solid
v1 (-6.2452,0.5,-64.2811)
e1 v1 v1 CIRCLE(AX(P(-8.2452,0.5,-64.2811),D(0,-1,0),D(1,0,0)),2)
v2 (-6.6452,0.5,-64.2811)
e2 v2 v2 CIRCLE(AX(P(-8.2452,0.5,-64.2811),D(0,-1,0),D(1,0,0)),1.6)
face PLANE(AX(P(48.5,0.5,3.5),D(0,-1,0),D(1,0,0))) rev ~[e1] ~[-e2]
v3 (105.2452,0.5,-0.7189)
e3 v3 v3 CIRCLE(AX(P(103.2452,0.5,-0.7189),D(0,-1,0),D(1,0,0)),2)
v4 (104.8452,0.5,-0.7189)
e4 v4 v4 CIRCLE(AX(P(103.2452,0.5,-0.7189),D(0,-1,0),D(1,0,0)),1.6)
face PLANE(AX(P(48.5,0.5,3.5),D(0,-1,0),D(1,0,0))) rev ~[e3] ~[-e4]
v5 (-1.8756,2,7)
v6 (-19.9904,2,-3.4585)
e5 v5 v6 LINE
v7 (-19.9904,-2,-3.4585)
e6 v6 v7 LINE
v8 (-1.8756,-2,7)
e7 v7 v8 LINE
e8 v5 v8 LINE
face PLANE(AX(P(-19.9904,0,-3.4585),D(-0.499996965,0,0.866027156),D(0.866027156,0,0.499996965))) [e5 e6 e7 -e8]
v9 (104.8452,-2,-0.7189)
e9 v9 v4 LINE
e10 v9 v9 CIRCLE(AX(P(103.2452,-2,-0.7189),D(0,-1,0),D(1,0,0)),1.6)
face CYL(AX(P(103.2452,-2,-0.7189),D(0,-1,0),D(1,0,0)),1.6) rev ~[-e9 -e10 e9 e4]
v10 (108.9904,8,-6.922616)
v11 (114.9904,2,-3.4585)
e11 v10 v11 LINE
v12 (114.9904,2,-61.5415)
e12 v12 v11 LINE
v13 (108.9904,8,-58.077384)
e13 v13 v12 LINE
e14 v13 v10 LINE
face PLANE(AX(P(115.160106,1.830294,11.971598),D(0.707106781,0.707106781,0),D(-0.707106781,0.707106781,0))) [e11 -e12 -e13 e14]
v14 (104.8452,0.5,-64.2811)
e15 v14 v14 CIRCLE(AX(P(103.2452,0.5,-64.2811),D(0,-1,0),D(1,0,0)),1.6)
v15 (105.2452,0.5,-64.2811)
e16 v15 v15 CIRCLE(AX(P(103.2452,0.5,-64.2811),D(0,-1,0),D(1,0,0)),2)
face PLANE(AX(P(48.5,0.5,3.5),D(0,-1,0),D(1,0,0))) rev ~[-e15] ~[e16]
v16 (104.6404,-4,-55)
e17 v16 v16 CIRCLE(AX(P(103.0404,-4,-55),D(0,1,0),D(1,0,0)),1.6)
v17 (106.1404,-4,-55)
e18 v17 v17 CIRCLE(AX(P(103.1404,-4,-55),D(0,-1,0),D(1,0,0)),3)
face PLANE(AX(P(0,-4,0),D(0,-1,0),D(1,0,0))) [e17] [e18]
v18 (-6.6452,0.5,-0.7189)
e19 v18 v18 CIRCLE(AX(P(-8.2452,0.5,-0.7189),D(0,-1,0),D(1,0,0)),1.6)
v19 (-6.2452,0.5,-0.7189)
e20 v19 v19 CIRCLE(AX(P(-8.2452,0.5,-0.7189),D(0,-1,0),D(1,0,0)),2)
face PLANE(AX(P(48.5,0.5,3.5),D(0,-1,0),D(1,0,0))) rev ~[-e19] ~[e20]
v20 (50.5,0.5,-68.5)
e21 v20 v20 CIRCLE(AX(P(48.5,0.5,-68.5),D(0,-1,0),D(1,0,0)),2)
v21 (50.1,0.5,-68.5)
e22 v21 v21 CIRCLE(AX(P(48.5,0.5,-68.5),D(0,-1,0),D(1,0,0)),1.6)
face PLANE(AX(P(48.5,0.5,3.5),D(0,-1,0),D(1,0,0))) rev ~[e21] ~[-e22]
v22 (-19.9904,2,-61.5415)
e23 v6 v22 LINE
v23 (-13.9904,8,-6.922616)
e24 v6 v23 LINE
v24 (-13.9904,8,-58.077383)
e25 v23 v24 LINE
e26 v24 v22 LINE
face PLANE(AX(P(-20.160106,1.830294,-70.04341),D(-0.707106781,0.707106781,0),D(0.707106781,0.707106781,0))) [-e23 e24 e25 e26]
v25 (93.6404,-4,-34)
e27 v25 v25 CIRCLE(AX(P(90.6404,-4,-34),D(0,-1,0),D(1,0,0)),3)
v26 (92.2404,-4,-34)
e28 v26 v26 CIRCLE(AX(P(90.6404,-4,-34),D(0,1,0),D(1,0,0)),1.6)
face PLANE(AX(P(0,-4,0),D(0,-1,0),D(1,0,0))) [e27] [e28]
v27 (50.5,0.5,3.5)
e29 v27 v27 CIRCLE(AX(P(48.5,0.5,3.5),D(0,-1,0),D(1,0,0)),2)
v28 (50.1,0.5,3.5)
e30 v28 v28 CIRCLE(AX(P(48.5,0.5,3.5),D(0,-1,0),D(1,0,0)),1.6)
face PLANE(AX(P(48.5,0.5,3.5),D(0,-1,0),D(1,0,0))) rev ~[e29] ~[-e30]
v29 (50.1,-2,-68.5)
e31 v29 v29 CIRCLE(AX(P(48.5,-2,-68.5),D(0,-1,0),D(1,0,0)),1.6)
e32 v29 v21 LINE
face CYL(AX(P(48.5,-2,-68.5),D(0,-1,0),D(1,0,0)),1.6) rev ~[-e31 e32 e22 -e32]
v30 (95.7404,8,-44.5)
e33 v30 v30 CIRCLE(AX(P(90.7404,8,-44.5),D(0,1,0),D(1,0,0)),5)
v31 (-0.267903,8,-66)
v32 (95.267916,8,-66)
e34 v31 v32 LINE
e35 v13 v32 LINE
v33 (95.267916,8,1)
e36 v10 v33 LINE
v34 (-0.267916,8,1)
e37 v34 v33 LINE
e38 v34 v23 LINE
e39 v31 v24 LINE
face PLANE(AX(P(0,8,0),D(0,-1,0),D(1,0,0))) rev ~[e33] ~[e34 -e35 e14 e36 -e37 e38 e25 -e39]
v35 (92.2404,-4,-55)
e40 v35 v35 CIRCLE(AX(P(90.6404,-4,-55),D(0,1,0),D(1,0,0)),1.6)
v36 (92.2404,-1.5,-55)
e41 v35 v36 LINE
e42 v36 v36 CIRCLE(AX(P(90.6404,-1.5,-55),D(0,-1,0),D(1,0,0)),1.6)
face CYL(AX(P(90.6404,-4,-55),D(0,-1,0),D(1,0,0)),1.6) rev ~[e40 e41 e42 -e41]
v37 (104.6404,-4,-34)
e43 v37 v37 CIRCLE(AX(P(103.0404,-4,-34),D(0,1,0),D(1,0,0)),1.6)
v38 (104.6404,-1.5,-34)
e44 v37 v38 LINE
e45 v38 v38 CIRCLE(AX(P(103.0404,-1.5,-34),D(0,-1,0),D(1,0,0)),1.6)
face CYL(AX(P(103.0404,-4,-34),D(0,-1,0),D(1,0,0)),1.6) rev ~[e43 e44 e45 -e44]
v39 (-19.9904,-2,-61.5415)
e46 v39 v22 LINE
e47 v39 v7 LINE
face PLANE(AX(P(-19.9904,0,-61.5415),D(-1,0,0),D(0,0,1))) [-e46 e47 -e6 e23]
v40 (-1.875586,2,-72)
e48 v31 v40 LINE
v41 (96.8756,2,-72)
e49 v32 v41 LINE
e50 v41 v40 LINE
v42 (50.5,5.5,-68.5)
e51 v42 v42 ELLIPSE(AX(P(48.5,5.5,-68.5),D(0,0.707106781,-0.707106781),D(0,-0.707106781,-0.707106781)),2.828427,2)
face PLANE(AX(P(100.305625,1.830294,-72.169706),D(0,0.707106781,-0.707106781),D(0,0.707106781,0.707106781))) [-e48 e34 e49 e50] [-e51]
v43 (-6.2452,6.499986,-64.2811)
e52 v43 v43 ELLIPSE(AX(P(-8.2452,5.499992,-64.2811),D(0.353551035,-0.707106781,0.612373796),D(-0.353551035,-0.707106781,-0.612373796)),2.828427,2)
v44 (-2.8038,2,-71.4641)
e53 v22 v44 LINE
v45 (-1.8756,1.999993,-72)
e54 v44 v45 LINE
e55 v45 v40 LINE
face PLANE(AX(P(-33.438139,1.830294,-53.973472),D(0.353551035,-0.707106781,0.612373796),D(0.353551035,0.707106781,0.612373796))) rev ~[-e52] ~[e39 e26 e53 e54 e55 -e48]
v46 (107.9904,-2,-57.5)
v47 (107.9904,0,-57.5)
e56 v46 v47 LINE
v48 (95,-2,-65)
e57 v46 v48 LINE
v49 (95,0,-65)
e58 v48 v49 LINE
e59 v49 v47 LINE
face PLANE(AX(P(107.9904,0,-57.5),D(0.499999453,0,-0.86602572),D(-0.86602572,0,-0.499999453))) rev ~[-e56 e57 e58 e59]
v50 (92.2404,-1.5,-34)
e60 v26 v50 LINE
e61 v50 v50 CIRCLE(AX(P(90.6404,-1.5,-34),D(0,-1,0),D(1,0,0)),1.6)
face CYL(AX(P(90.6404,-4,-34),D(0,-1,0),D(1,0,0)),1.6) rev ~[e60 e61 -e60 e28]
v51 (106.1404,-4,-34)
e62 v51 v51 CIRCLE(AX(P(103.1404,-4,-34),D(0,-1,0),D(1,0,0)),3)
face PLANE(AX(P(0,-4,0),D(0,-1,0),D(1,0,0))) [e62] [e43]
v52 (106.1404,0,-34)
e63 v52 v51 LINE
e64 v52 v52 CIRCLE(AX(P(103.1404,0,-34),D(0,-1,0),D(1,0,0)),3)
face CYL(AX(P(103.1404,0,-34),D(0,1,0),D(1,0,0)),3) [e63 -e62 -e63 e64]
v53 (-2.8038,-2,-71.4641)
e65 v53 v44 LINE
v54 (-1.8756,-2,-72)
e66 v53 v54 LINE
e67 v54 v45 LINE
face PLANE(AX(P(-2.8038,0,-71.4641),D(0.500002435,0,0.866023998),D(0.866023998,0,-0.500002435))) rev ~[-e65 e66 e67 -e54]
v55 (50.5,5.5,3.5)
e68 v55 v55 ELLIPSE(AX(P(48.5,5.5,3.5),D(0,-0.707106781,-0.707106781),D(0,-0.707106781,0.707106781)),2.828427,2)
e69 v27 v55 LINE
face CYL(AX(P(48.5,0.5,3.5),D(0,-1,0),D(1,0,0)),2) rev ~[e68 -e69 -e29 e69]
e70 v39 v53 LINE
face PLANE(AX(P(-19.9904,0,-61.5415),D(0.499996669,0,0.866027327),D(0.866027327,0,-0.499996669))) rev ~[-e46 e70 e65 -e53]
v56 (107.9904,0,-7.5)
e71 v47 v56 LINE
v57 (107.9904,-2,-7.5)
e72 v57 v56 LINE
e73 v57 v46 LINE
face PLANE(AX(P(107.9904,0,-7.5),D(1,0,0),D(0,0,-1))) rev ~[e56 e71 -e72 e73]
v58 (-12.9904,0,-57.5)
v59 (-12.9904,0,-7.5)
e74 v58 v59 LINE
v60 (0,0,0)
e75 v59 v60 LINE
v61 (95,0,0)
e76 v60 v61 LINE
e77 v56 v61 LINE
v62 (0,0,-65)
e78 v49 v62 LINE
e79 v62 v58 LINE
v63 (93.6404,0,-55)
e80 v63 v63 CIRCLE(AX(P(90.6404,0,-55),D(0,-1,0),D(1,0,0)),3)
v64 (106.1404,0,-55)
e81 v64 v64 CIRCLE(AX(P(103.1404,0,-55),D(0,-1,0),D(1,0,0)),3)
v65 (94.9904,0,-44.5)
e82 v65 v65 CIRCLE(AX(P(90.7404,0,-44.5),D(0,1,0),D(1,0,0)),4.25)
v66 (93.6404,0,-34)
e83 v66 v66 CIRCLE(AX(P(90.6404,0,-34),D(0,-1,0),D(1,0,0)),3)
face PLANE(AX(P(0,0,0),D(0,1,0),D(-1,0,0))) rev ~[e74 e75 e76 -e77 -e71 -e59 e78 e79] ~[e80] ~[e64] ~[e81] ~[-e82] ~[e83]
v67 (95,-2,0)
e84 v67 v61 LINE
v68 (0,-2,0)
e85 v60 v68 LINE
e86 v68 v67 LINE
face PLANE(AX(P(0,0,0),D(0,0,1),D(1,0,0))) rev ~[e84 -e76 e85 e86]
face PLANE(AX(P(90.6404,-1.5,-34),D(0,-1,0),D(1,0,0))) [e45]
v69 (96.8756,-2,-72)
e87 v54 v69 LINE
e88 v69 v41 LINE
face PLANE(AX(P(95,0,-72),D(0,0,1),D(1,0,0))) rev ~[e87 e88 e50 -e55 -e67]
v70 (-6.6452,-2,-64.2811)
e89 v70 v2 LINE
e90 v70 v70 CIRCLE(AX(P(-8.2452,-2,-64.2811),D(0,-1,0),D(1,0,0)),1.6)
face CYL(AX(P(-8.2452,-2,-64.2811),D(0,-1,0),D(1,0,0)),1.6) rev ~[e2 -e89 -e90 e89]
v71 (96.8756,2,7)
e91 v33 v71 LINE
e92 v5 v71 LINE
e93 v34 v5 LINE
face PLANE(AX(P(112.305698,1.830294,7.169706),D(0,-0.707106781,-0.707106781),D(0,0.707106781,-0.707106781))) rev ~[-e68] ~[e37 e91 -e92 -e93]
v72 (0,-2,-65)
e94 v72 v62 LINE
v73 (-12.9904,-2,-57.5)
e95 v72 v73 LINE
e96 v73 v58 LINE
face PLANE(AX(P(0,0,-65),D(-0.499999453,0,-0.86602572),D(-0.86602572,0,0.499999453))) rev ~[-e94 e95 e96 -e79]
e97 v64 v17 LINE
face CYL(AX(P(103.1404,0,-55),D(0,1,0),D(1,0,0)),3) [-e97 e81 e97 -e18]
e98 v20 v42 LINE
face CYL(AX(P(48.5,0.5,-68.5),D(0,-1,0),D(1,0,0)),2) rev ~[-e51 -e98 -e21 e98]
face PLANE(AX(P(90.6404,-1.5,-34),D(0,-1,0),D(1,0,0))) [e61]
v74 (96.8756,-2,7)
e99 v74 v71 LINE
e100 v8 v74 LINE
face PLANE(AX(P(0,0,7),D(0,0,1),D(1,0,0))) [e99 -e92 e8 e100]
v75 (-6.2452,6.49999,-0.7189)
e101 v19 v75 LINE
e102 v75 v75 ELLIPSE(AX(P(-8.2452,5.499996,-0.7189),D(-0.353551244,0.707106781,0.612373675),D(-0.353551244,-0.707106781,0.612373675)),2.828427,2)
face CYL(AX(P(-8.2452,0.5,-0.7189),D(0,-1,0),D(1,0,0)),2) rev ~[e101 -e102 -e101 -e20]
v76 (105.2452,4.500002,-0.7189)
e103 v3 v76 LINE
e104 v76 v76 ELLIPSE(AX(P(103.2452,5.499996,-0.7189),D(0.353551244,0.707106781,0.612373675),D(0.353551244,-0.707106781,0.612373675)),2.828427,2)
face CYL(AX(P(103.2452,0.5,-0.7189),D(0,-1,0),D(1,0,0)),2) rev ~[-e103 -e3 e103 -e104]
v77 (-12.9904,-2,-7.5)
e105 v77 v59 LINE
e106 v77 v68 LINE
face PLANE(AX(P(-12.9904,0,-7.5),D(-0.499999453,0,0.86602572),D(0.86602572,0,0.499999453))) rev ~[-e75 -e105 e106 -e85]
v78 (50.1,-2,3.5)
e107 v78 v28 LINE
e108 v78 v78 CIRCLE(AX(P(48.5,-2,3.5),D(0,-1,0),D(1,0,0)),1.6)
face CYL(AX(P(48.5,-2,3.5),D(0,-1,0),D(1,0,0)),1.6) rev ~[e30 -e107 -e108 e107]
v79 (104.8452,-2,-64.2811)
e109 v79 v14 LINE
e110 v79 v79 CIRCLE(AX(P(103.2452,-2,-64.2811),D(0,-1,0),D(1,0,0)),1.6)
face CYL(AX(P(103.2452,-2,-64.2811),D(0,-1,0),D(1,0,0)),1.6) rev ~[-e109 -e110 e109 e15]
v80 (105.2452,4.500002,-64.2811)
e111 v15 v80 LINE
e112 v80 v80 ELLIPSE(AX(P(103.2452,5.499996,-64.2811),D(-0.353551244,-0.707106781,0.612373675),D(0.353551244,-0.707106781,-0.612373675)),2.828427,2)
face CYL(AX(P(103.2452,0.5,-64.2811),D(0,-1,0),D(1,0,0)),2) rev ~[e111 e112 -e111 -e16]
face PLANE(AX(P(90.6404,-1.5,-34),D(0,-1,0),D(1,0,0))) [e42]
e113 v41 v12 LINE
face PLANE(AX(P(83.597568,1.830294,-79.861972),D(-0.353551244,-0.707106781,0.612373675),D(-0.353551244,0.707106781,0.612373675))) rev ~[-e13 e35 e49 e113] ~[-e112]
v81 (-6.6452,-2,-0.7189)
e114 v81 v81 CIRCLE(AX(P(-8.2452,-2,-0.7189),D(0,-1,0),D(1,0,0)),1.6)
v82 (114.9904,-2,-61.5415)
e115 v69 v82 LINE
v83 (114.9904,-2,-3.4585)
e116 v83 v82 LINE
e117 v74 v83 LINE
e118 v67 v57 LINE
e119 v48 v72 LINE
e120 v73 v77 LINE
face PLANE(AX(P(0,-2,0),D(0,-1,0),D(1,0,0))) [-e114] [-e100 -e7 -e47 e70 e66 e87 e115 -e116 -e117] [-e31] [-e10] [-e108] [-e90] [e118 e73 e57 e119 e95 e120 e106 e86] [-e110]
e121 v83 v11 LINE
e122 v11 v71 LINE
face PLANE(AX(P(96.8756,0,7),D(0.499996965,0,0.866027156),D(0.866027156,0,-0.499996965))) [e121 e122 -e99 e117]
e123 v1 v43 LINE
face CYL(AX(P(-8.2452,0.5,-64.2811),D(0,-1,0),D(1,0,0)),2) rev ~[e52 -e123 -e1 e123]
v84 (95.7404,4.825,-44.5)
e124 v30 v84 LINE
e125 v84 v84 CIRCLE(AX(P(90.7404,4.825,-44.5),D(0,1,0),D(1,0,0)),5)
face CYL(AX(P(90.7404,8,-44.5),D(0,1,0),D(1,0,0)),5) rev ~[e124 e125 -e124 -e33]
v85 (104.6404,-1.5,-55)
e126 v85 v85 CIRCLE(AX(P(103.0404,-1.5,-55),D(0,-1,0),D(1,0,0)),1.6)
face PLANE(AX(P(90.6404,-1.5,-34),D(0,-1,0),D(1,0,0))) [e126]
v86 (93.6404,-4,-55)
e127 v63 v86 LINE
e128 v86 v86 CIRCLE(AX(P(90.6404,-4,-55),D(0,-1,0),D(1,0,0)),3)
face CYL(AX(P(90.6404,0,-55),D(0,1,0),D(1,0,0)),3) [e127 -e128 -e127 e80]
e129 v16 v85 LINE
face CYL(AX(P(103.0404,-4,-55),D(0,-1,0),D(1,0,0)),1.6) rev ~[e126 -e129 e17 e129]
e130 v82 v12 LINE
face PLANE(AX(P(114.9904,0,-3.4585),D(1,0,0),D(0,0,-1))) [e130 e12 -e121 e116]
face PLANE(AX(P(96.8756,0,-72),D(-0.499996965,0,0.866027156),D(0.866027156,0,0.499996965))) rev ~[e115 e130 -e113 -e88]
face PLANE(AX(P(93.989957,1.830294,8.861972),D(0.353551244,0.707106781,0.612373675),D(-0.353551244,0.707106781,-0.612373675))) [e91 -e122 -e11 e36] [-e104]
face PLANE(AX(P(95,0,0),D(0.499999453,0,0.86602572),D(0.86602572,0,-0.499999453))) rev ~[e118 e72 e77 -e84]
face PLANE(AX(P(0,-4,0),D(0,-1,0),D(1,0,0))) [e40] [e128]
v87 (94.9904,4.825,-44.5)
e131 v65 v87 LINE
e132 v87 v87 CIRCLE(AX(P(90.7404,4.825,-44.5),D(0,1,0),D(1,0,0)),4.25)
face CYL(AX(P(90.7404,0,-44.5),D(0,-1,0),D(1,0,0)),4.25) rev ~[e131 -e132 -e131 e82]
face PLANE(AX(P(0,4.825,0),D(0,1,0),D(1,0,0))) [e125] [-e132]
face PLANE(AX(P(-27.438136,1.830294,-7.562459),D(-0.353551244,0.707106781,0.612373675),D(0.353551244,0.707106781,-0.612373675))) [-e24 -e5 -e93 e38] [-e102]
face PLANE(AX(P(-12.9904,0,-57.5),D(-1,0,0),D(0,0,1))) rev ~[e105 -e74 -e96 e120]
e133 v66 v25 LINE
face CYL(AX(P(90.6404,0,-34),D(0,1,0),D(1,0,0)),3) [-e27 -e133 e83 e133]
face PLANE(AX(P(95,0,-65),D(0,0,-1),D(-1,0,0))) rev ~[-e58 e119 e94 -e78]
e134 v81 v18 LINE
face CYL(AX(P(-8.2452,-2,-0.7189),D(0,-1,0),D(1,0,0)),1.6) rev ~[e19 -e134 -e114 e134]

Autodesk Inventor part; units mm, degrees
ref_plane "YZ Plane" through (0, 0, 0) normal (1, 0, 0) x (0, 1, 0)
ref_plane "XZ Plane" through (0, 0, 0) normal (0, 1, 0) x (-1, 0, 0)
sketch "Sketch5" plane through (0, 0, 0) normal (0, 1, 0) x (-1, 0, 0)
  line L0 (0, 0) -> (-95, 0)
  line L1 (-95, 0) -> (-95, -65)
  line L2 (-95, -65) -> (0, -65)
  line L3 (0, -65) -> (0, 0)
  line L4 (0, -65) -> (12.9904, -57.5)
  line L5 (12.9904, -57.5) -> (12.9904, -7.5)
  line L6 (12.9904, -7.5) -> (0, 0)
  line L7 (-95, -65) -> (-107.9904, -57.5)
  line L8 (-107.9904, -57.5) -> (-107.9904, -7.5)
  line L9 (-107.9904, -7.5) -> (-95, 0)
  dimension "d23" = 95
  dimension "d24" = 65
  dimension "d25" = 15
  dimension "d26" = 15
  dimension "d27" = 120
  dimension "d28" = 15
  dimension "d29" = 15
  dimension "d30" = 120
extrude "Extrusion3" add sketch "Sketch5" along normal blind 8
sketch "Sketch6" plane through (0, 0, 0) normal (0, -1, 0) x (1, 0, 0)
  line L0 (0, 7) -> (87, 7)
  line L1 (95, -72) -> (8, -72)
  line L2 (0, 0) -> (95, 0) projected
  line L3 (95, -65) -> (0, -65) projected
  line L4 (96.8756, 7) -> (114.9904, -3.4585)
  line L5 (95, 0) -> (107.9904, -7.5) projected
  line L6 (114.9904, -3.4585) -> (114.9904, -61.5415)
  line L7 (107.9904, -7.5) -> (107.9904, -57.5) projected
  line L8 (96.8756, -72) -> (114.9904, -61.5415)
  line L9 (107.9904, -57.5) -> (95, -65) projected
  line L10 (107.9904, -57.5) -> (95, -65) projected
  line L11 (87, 7) -> (96.8756, 7)
  line L12 (95, -72) -> (96.8756, -72)
  line L13 (0, 7) -> (-1.8756, 7)
  line L14 (-19.9904, -3.4585) -> (-1.8756, 7)
  line L15 (-19.9904, -61.5415) -> (-2.8038, -71.4641)
  line L16 (0, -65) -> (-12.9904, -57.5) projected
  line L17 (-12.9904, -7.5) -> (0, 0) projected
  line L18 (-19.9904, -61.5415) -> (-19.9904, -3.4585)
  line L19 (-12.9904, -57.5) -> (-12.9904, -7.5) projected
  line L20 (0, -65) -> (-12.9904, -57.5) projected
  line L21 (-12.9904, -7.5) -> (-12.9904, -57.5)
  line L22 (-12.9904, -57.5) -> (0, -65)
  line L23 (95, -65) -> (0, -65) projected
  line L24 (0, -65) -> (95, -65)
  line L25 (95, -65) -> (107.9904, -57.5)
  line L26 (107.9904, -7.5) -> (107.9904, -57.5)
  line L27 (95, 0) -> (107.9904, -7.5) projected
  line L28 (107.9904, -7.5) -> (95, 0)
  line L29 (0, 0) -> (-12.9904, -7.5)
  line L30 (95, 0) -> (0, 0)
  line L31 (8, -72) -> (-1.8756, -72)
  line L32 (-2.8038, -71.4641) -> (-1.8756, -72)
  dimension "d33" = 7
  dimension "d34" = 7
  dimension "d35" = 7
  dimension "d36" = 7
  dimension "d37" = 7
  dimension "d38" = 7
  dimension "d39" = 7
  dimension "d40" = 7
extrude "Extrusion4" add sketch "Sketch6" along normal blind 2 and the other way blind 8
chamfer "Chamfer1" distance 6 angle 45 8 edges at (47.5, 8, 7) (-10.933, 8, 1.7707) (-19.9904, 8, -32.5) (-10.933, 8, -66.7707) (47.5, 8, -72) (105.933, 8, -66.7707) (114.9904, 8, -32.5) (105.933, 8, 1.7707)
sketch "Sketch7" plane through (0, 0, 0) normal (0, -1, 0) x (1, 0, 0)
  line L0 (86.4904, -40.25) -> (94.9904, -40.25)
  line L1 (94.9904, -40.25) -> (94.9904, -48.75)
  line L2 (94.9904, -48.75) -> (86.4904, -48.75)
  line L3 (86.4904, -48.75) -> (86.4904, -40.25)
  line L4 (96.8756, 7) -> (-1.8756, 7) projected
  line L5 (114.9904, -61.5415) -> (114.9904, -3.4585) projected
  circle A0 centre (90.6404, -55) radius 3
  circle A1 centre (90.6404, -34) radius 3
  circle A2 centre (103.1404, -34) radius 3
  circle A3 centre (103.1404, -55) radius 3
  circle A4 centre (90.7404, -44.5) radius 4.25
  circle A5 centre (46.5, 2.8174) radius 1.834
  circle A6 centre (46.5, -64.297) radius 1.834
  line L6 (-1.8756, -72) -> (96.8756, -72) projected
  point P0 (0, 0)
  dimension "d48" = 8.5
  dimension "d50" = 20
  dimension "d51" = 6.25
  dimension "d52" = 8.15
  dimension "d53" = 12.5
  dimension "d54" = 0
  dimension "d55" = 21
  dimension "d56" = 12.5
  dimension "d57" = 0
  dimension "d58" = 0
  dimension "d59" = 6
  dimension "d61" = 8.5
  dimension "d107" = 27.5
sketch "Sketch9" plane through (0, -2, 0) normal (0, -1, 0) x (1, 0, 0)
  circle A0 centre (-8.2452, -0.7189) radius 1.6
  line L0 (0, -65) -> (-12.9904, -57.5) projected
  line L1 (0, -65) -> (-1.8756, -72) projected
  line L2 (95, -65) -> (0, -65) projected
  line L3 (107.9904, -7.5) -> (107.9904, -57.5) projected
  line L4 (0, 0) -> (95, 0) projected
  line L5 (-12.9904, -7.5) -> (-16.4904, -1.4378)
  line L6 (-19.9904, -3.4585) -> (-1.8756, 7) projected
  line L7 (0, 0) -> (-3.5, 6.0622)
  line L8 (-12.9904, -57.5) -> (-19.9904, -61.5415) projected
  line L9 (-12.9904, -57.5) -> (-15.4904, -61.8301)
  line L10 (0, -65) -> (-2.5, -69.3301)
  line L11 (95, -65) -> (97.5, -69.3301)
  line L12 (95, 0) -> (98.5, 6.0622)
  line L13 (96.8756, 7) -> (114.9904, -3.4585) projected
  line L14 (107.9904, -7.5) -> (114.9904, -3.4585) projected
  line L15 (107.9904, -7.5) -> (111.4904, -1.4378)
  line L16 (107.9904, -57.5) -> (111.4904, -63.5622)
  line L17 (96.8756, -72) -> (114.9904, -61.5415) projected
  line L18 (107.9904, -57.5) -> (95, -65) projected
  line L19 (95, 0) -> (107.9904, -7.5) projected
  circle A1 centre (-8.2452, -64.2811) radius 1.6
  circle A2 centre (103.2452, -64.2811) radius 1.6
  circle A3 centre (103.2452, -0.7189) radius 1.6
  circle A4 centre (48.5, 3.5) radius 1.6
  circle A5 centre (48.5, -68.5) radius 1.6
  line L20 (95, -65) -> (95, -72)
  line L21 (-1.8756, -72) -> (96.8756, -72) projected
  line L22 (95, 0) -> (95, 7)
  line L23 (96.8756, 7) -> (-1.8756, 7) projected
  dimension "d62" = 90
  dimension "d63" = 90
  dimension "d64" = 90
  dimension "d65" = 7.5
  dimension "d66" = 3.5
  dimension "d67" = 3.2
  dimension "d68" = 7.5
  dimension "d69" = 3.5
  dimension "d70" = 3.5
  dimension "d71" = 7.5
  dimension "d72" = 7.5
  dimension "d73" = 3.5
  dimension "d76" = 3.5
  dimension "d77" = 46.5
  dimension "d78" = 3.5
  dimension "d79" = 46.5
extrude "Extrusion6" cut sketch "Sketch9" against normal blind 2.5 contours A0 | A1 | A2 | A3 | A4 | A5
sketch "Sketch13" plane through (48.5, 0.5, 3.5) normal (0, -1, 0) x (1, 0, 0)
  circle A0 centre (0, 0) radius 2
  circle A1 centre (54.7452, -4.2189) radius 2
  circle A2 centre (54.7452, -67.7811) radius 2
  circle A3 centre (0, -72) radius 2
  circle A4 centre (-56.7452, -67.7811) radius 2
  circle A5 centre (-56.7452, -4.2189) radius 2
  circle A6 centre (-56.7452, -4.2189) radius 1.6 projected
  circle A7 centre (0, 0) radius 1.6 projected
  circle A8 centre (54.7452, -4.2189) radius 1.6 projected
  circle A9 centre (54.7452, -67.7811) radius 1.6 projected
  circle A10 centre (0, -72) radius 1.6 projected
  circle A11 centre (-56.7452, -67.7811) radius 1.6 projected
  point P0 (-48.5, -3.5)
  dimension "d90" = 4
  dimension "d91" = 4
  dimension "d92" = 4
  dimension "d93" = 4
  dimension "d94" = 4
  dimension "d95" = 4
extrude "Extrusion7" cut sketch "Sketch13" against normal blind 10 contours A0 | A1 | A2 | A3 | A4 | A5 | A6 | A7 | A8 | A9 | A10 | A11
extrude "Extrusion8" add sketch "Sketch7" along normal blind 4 contours A0 | A1 | A2 | A3
sketch "Sketch14" plane through (0, 0, 0) normal (0, -1, 0) x (1, 0, 0)
  line L0 (86.4904, -48.75) -> (94.9904, -48.75)
  line L1 (94.9904, -48.75) -> (94.9904, -40.25)
  line L2 (94.9904, -40.25) -> (86.4904, -40.25)
  line L3 (86.4904, -40.25) -> (86.4904, -48.75)
  line L4 (95, -65) -> (0, -65) projected
  line L5 (107.9904, -7.5) -> (107.9904, -57.5) projected
  circle A0 centre (90.7404, -44.5) radius 4.25
  circle A1 centre (90.6404, -55) radius 3 projected
  point P0 (0, 0)
  dimension "d100" = 8.5
  dimension "d101" = 8.5
  dimension "d103" = 13
  dimension "d104" = 8.5
  dimension "d108" = 9.25
extrude "Extrusion9" cut sketch "Sketch14" against normal blind 10 contours A0
ref_plane "Work Plane1" through (0, -6, 0) normal (0, -1, 0) x (1, 0, 0)
sketch "Sketch15" plane through (90.6404, -4, -34) normal (0, -1, 0) x (1, 0, 0)
  circle A0 centre (0, 0) radius 1.6
  circle A1 centre (12.4, 0) radius 1.6
  line L0 (12.4, 0) -> (0, 0)
  line L1 (0, 0) -> (0, -21)
  line L2 (0, -21) -> (12.4, -21)
  line L3 (12.4, -21) -> (12.4, 0)
  circle A2 centre (12.4, -21) radius 1.6
  circle A3 centre (0, -21) radius 1.6
  point P0 (-90.6404, 34)
  dimension "d110" = 3.2
  dimension "d111" = 3.2
  dimension "d112" = 12.4
  dimension "d113" = 21
  dimension "d114" = 3.2
  dimension "d115" = 3.2
extrude "Extrusion10" cut sketch "Sketch15" against normal blind 2.5 contours L0 L1 A0 | A0 L1 L0 | L0 L3 A1 | A1 L3 L0 | A3 L2 L1 | L1 L2 A3 | A2 L2 L3 | L3 L2 A2
sketch "Sketch16" plane through (0, 8, 0) normal (0, 1, 0) x (1, 0, 0)
  circle A0 centre (90.7404, 44.5) radius 5
  circle A1 centre (90.7404, 44.5) radius 4.25 projected
  point P0 (0, 0)
  dimension "d118" = 10
extrude "Extrusion11" cut sketch "Sketch16" against normal blind 3.175
equation "\"d56\" = d53"
properties part number "FSCase_Top_v6"
